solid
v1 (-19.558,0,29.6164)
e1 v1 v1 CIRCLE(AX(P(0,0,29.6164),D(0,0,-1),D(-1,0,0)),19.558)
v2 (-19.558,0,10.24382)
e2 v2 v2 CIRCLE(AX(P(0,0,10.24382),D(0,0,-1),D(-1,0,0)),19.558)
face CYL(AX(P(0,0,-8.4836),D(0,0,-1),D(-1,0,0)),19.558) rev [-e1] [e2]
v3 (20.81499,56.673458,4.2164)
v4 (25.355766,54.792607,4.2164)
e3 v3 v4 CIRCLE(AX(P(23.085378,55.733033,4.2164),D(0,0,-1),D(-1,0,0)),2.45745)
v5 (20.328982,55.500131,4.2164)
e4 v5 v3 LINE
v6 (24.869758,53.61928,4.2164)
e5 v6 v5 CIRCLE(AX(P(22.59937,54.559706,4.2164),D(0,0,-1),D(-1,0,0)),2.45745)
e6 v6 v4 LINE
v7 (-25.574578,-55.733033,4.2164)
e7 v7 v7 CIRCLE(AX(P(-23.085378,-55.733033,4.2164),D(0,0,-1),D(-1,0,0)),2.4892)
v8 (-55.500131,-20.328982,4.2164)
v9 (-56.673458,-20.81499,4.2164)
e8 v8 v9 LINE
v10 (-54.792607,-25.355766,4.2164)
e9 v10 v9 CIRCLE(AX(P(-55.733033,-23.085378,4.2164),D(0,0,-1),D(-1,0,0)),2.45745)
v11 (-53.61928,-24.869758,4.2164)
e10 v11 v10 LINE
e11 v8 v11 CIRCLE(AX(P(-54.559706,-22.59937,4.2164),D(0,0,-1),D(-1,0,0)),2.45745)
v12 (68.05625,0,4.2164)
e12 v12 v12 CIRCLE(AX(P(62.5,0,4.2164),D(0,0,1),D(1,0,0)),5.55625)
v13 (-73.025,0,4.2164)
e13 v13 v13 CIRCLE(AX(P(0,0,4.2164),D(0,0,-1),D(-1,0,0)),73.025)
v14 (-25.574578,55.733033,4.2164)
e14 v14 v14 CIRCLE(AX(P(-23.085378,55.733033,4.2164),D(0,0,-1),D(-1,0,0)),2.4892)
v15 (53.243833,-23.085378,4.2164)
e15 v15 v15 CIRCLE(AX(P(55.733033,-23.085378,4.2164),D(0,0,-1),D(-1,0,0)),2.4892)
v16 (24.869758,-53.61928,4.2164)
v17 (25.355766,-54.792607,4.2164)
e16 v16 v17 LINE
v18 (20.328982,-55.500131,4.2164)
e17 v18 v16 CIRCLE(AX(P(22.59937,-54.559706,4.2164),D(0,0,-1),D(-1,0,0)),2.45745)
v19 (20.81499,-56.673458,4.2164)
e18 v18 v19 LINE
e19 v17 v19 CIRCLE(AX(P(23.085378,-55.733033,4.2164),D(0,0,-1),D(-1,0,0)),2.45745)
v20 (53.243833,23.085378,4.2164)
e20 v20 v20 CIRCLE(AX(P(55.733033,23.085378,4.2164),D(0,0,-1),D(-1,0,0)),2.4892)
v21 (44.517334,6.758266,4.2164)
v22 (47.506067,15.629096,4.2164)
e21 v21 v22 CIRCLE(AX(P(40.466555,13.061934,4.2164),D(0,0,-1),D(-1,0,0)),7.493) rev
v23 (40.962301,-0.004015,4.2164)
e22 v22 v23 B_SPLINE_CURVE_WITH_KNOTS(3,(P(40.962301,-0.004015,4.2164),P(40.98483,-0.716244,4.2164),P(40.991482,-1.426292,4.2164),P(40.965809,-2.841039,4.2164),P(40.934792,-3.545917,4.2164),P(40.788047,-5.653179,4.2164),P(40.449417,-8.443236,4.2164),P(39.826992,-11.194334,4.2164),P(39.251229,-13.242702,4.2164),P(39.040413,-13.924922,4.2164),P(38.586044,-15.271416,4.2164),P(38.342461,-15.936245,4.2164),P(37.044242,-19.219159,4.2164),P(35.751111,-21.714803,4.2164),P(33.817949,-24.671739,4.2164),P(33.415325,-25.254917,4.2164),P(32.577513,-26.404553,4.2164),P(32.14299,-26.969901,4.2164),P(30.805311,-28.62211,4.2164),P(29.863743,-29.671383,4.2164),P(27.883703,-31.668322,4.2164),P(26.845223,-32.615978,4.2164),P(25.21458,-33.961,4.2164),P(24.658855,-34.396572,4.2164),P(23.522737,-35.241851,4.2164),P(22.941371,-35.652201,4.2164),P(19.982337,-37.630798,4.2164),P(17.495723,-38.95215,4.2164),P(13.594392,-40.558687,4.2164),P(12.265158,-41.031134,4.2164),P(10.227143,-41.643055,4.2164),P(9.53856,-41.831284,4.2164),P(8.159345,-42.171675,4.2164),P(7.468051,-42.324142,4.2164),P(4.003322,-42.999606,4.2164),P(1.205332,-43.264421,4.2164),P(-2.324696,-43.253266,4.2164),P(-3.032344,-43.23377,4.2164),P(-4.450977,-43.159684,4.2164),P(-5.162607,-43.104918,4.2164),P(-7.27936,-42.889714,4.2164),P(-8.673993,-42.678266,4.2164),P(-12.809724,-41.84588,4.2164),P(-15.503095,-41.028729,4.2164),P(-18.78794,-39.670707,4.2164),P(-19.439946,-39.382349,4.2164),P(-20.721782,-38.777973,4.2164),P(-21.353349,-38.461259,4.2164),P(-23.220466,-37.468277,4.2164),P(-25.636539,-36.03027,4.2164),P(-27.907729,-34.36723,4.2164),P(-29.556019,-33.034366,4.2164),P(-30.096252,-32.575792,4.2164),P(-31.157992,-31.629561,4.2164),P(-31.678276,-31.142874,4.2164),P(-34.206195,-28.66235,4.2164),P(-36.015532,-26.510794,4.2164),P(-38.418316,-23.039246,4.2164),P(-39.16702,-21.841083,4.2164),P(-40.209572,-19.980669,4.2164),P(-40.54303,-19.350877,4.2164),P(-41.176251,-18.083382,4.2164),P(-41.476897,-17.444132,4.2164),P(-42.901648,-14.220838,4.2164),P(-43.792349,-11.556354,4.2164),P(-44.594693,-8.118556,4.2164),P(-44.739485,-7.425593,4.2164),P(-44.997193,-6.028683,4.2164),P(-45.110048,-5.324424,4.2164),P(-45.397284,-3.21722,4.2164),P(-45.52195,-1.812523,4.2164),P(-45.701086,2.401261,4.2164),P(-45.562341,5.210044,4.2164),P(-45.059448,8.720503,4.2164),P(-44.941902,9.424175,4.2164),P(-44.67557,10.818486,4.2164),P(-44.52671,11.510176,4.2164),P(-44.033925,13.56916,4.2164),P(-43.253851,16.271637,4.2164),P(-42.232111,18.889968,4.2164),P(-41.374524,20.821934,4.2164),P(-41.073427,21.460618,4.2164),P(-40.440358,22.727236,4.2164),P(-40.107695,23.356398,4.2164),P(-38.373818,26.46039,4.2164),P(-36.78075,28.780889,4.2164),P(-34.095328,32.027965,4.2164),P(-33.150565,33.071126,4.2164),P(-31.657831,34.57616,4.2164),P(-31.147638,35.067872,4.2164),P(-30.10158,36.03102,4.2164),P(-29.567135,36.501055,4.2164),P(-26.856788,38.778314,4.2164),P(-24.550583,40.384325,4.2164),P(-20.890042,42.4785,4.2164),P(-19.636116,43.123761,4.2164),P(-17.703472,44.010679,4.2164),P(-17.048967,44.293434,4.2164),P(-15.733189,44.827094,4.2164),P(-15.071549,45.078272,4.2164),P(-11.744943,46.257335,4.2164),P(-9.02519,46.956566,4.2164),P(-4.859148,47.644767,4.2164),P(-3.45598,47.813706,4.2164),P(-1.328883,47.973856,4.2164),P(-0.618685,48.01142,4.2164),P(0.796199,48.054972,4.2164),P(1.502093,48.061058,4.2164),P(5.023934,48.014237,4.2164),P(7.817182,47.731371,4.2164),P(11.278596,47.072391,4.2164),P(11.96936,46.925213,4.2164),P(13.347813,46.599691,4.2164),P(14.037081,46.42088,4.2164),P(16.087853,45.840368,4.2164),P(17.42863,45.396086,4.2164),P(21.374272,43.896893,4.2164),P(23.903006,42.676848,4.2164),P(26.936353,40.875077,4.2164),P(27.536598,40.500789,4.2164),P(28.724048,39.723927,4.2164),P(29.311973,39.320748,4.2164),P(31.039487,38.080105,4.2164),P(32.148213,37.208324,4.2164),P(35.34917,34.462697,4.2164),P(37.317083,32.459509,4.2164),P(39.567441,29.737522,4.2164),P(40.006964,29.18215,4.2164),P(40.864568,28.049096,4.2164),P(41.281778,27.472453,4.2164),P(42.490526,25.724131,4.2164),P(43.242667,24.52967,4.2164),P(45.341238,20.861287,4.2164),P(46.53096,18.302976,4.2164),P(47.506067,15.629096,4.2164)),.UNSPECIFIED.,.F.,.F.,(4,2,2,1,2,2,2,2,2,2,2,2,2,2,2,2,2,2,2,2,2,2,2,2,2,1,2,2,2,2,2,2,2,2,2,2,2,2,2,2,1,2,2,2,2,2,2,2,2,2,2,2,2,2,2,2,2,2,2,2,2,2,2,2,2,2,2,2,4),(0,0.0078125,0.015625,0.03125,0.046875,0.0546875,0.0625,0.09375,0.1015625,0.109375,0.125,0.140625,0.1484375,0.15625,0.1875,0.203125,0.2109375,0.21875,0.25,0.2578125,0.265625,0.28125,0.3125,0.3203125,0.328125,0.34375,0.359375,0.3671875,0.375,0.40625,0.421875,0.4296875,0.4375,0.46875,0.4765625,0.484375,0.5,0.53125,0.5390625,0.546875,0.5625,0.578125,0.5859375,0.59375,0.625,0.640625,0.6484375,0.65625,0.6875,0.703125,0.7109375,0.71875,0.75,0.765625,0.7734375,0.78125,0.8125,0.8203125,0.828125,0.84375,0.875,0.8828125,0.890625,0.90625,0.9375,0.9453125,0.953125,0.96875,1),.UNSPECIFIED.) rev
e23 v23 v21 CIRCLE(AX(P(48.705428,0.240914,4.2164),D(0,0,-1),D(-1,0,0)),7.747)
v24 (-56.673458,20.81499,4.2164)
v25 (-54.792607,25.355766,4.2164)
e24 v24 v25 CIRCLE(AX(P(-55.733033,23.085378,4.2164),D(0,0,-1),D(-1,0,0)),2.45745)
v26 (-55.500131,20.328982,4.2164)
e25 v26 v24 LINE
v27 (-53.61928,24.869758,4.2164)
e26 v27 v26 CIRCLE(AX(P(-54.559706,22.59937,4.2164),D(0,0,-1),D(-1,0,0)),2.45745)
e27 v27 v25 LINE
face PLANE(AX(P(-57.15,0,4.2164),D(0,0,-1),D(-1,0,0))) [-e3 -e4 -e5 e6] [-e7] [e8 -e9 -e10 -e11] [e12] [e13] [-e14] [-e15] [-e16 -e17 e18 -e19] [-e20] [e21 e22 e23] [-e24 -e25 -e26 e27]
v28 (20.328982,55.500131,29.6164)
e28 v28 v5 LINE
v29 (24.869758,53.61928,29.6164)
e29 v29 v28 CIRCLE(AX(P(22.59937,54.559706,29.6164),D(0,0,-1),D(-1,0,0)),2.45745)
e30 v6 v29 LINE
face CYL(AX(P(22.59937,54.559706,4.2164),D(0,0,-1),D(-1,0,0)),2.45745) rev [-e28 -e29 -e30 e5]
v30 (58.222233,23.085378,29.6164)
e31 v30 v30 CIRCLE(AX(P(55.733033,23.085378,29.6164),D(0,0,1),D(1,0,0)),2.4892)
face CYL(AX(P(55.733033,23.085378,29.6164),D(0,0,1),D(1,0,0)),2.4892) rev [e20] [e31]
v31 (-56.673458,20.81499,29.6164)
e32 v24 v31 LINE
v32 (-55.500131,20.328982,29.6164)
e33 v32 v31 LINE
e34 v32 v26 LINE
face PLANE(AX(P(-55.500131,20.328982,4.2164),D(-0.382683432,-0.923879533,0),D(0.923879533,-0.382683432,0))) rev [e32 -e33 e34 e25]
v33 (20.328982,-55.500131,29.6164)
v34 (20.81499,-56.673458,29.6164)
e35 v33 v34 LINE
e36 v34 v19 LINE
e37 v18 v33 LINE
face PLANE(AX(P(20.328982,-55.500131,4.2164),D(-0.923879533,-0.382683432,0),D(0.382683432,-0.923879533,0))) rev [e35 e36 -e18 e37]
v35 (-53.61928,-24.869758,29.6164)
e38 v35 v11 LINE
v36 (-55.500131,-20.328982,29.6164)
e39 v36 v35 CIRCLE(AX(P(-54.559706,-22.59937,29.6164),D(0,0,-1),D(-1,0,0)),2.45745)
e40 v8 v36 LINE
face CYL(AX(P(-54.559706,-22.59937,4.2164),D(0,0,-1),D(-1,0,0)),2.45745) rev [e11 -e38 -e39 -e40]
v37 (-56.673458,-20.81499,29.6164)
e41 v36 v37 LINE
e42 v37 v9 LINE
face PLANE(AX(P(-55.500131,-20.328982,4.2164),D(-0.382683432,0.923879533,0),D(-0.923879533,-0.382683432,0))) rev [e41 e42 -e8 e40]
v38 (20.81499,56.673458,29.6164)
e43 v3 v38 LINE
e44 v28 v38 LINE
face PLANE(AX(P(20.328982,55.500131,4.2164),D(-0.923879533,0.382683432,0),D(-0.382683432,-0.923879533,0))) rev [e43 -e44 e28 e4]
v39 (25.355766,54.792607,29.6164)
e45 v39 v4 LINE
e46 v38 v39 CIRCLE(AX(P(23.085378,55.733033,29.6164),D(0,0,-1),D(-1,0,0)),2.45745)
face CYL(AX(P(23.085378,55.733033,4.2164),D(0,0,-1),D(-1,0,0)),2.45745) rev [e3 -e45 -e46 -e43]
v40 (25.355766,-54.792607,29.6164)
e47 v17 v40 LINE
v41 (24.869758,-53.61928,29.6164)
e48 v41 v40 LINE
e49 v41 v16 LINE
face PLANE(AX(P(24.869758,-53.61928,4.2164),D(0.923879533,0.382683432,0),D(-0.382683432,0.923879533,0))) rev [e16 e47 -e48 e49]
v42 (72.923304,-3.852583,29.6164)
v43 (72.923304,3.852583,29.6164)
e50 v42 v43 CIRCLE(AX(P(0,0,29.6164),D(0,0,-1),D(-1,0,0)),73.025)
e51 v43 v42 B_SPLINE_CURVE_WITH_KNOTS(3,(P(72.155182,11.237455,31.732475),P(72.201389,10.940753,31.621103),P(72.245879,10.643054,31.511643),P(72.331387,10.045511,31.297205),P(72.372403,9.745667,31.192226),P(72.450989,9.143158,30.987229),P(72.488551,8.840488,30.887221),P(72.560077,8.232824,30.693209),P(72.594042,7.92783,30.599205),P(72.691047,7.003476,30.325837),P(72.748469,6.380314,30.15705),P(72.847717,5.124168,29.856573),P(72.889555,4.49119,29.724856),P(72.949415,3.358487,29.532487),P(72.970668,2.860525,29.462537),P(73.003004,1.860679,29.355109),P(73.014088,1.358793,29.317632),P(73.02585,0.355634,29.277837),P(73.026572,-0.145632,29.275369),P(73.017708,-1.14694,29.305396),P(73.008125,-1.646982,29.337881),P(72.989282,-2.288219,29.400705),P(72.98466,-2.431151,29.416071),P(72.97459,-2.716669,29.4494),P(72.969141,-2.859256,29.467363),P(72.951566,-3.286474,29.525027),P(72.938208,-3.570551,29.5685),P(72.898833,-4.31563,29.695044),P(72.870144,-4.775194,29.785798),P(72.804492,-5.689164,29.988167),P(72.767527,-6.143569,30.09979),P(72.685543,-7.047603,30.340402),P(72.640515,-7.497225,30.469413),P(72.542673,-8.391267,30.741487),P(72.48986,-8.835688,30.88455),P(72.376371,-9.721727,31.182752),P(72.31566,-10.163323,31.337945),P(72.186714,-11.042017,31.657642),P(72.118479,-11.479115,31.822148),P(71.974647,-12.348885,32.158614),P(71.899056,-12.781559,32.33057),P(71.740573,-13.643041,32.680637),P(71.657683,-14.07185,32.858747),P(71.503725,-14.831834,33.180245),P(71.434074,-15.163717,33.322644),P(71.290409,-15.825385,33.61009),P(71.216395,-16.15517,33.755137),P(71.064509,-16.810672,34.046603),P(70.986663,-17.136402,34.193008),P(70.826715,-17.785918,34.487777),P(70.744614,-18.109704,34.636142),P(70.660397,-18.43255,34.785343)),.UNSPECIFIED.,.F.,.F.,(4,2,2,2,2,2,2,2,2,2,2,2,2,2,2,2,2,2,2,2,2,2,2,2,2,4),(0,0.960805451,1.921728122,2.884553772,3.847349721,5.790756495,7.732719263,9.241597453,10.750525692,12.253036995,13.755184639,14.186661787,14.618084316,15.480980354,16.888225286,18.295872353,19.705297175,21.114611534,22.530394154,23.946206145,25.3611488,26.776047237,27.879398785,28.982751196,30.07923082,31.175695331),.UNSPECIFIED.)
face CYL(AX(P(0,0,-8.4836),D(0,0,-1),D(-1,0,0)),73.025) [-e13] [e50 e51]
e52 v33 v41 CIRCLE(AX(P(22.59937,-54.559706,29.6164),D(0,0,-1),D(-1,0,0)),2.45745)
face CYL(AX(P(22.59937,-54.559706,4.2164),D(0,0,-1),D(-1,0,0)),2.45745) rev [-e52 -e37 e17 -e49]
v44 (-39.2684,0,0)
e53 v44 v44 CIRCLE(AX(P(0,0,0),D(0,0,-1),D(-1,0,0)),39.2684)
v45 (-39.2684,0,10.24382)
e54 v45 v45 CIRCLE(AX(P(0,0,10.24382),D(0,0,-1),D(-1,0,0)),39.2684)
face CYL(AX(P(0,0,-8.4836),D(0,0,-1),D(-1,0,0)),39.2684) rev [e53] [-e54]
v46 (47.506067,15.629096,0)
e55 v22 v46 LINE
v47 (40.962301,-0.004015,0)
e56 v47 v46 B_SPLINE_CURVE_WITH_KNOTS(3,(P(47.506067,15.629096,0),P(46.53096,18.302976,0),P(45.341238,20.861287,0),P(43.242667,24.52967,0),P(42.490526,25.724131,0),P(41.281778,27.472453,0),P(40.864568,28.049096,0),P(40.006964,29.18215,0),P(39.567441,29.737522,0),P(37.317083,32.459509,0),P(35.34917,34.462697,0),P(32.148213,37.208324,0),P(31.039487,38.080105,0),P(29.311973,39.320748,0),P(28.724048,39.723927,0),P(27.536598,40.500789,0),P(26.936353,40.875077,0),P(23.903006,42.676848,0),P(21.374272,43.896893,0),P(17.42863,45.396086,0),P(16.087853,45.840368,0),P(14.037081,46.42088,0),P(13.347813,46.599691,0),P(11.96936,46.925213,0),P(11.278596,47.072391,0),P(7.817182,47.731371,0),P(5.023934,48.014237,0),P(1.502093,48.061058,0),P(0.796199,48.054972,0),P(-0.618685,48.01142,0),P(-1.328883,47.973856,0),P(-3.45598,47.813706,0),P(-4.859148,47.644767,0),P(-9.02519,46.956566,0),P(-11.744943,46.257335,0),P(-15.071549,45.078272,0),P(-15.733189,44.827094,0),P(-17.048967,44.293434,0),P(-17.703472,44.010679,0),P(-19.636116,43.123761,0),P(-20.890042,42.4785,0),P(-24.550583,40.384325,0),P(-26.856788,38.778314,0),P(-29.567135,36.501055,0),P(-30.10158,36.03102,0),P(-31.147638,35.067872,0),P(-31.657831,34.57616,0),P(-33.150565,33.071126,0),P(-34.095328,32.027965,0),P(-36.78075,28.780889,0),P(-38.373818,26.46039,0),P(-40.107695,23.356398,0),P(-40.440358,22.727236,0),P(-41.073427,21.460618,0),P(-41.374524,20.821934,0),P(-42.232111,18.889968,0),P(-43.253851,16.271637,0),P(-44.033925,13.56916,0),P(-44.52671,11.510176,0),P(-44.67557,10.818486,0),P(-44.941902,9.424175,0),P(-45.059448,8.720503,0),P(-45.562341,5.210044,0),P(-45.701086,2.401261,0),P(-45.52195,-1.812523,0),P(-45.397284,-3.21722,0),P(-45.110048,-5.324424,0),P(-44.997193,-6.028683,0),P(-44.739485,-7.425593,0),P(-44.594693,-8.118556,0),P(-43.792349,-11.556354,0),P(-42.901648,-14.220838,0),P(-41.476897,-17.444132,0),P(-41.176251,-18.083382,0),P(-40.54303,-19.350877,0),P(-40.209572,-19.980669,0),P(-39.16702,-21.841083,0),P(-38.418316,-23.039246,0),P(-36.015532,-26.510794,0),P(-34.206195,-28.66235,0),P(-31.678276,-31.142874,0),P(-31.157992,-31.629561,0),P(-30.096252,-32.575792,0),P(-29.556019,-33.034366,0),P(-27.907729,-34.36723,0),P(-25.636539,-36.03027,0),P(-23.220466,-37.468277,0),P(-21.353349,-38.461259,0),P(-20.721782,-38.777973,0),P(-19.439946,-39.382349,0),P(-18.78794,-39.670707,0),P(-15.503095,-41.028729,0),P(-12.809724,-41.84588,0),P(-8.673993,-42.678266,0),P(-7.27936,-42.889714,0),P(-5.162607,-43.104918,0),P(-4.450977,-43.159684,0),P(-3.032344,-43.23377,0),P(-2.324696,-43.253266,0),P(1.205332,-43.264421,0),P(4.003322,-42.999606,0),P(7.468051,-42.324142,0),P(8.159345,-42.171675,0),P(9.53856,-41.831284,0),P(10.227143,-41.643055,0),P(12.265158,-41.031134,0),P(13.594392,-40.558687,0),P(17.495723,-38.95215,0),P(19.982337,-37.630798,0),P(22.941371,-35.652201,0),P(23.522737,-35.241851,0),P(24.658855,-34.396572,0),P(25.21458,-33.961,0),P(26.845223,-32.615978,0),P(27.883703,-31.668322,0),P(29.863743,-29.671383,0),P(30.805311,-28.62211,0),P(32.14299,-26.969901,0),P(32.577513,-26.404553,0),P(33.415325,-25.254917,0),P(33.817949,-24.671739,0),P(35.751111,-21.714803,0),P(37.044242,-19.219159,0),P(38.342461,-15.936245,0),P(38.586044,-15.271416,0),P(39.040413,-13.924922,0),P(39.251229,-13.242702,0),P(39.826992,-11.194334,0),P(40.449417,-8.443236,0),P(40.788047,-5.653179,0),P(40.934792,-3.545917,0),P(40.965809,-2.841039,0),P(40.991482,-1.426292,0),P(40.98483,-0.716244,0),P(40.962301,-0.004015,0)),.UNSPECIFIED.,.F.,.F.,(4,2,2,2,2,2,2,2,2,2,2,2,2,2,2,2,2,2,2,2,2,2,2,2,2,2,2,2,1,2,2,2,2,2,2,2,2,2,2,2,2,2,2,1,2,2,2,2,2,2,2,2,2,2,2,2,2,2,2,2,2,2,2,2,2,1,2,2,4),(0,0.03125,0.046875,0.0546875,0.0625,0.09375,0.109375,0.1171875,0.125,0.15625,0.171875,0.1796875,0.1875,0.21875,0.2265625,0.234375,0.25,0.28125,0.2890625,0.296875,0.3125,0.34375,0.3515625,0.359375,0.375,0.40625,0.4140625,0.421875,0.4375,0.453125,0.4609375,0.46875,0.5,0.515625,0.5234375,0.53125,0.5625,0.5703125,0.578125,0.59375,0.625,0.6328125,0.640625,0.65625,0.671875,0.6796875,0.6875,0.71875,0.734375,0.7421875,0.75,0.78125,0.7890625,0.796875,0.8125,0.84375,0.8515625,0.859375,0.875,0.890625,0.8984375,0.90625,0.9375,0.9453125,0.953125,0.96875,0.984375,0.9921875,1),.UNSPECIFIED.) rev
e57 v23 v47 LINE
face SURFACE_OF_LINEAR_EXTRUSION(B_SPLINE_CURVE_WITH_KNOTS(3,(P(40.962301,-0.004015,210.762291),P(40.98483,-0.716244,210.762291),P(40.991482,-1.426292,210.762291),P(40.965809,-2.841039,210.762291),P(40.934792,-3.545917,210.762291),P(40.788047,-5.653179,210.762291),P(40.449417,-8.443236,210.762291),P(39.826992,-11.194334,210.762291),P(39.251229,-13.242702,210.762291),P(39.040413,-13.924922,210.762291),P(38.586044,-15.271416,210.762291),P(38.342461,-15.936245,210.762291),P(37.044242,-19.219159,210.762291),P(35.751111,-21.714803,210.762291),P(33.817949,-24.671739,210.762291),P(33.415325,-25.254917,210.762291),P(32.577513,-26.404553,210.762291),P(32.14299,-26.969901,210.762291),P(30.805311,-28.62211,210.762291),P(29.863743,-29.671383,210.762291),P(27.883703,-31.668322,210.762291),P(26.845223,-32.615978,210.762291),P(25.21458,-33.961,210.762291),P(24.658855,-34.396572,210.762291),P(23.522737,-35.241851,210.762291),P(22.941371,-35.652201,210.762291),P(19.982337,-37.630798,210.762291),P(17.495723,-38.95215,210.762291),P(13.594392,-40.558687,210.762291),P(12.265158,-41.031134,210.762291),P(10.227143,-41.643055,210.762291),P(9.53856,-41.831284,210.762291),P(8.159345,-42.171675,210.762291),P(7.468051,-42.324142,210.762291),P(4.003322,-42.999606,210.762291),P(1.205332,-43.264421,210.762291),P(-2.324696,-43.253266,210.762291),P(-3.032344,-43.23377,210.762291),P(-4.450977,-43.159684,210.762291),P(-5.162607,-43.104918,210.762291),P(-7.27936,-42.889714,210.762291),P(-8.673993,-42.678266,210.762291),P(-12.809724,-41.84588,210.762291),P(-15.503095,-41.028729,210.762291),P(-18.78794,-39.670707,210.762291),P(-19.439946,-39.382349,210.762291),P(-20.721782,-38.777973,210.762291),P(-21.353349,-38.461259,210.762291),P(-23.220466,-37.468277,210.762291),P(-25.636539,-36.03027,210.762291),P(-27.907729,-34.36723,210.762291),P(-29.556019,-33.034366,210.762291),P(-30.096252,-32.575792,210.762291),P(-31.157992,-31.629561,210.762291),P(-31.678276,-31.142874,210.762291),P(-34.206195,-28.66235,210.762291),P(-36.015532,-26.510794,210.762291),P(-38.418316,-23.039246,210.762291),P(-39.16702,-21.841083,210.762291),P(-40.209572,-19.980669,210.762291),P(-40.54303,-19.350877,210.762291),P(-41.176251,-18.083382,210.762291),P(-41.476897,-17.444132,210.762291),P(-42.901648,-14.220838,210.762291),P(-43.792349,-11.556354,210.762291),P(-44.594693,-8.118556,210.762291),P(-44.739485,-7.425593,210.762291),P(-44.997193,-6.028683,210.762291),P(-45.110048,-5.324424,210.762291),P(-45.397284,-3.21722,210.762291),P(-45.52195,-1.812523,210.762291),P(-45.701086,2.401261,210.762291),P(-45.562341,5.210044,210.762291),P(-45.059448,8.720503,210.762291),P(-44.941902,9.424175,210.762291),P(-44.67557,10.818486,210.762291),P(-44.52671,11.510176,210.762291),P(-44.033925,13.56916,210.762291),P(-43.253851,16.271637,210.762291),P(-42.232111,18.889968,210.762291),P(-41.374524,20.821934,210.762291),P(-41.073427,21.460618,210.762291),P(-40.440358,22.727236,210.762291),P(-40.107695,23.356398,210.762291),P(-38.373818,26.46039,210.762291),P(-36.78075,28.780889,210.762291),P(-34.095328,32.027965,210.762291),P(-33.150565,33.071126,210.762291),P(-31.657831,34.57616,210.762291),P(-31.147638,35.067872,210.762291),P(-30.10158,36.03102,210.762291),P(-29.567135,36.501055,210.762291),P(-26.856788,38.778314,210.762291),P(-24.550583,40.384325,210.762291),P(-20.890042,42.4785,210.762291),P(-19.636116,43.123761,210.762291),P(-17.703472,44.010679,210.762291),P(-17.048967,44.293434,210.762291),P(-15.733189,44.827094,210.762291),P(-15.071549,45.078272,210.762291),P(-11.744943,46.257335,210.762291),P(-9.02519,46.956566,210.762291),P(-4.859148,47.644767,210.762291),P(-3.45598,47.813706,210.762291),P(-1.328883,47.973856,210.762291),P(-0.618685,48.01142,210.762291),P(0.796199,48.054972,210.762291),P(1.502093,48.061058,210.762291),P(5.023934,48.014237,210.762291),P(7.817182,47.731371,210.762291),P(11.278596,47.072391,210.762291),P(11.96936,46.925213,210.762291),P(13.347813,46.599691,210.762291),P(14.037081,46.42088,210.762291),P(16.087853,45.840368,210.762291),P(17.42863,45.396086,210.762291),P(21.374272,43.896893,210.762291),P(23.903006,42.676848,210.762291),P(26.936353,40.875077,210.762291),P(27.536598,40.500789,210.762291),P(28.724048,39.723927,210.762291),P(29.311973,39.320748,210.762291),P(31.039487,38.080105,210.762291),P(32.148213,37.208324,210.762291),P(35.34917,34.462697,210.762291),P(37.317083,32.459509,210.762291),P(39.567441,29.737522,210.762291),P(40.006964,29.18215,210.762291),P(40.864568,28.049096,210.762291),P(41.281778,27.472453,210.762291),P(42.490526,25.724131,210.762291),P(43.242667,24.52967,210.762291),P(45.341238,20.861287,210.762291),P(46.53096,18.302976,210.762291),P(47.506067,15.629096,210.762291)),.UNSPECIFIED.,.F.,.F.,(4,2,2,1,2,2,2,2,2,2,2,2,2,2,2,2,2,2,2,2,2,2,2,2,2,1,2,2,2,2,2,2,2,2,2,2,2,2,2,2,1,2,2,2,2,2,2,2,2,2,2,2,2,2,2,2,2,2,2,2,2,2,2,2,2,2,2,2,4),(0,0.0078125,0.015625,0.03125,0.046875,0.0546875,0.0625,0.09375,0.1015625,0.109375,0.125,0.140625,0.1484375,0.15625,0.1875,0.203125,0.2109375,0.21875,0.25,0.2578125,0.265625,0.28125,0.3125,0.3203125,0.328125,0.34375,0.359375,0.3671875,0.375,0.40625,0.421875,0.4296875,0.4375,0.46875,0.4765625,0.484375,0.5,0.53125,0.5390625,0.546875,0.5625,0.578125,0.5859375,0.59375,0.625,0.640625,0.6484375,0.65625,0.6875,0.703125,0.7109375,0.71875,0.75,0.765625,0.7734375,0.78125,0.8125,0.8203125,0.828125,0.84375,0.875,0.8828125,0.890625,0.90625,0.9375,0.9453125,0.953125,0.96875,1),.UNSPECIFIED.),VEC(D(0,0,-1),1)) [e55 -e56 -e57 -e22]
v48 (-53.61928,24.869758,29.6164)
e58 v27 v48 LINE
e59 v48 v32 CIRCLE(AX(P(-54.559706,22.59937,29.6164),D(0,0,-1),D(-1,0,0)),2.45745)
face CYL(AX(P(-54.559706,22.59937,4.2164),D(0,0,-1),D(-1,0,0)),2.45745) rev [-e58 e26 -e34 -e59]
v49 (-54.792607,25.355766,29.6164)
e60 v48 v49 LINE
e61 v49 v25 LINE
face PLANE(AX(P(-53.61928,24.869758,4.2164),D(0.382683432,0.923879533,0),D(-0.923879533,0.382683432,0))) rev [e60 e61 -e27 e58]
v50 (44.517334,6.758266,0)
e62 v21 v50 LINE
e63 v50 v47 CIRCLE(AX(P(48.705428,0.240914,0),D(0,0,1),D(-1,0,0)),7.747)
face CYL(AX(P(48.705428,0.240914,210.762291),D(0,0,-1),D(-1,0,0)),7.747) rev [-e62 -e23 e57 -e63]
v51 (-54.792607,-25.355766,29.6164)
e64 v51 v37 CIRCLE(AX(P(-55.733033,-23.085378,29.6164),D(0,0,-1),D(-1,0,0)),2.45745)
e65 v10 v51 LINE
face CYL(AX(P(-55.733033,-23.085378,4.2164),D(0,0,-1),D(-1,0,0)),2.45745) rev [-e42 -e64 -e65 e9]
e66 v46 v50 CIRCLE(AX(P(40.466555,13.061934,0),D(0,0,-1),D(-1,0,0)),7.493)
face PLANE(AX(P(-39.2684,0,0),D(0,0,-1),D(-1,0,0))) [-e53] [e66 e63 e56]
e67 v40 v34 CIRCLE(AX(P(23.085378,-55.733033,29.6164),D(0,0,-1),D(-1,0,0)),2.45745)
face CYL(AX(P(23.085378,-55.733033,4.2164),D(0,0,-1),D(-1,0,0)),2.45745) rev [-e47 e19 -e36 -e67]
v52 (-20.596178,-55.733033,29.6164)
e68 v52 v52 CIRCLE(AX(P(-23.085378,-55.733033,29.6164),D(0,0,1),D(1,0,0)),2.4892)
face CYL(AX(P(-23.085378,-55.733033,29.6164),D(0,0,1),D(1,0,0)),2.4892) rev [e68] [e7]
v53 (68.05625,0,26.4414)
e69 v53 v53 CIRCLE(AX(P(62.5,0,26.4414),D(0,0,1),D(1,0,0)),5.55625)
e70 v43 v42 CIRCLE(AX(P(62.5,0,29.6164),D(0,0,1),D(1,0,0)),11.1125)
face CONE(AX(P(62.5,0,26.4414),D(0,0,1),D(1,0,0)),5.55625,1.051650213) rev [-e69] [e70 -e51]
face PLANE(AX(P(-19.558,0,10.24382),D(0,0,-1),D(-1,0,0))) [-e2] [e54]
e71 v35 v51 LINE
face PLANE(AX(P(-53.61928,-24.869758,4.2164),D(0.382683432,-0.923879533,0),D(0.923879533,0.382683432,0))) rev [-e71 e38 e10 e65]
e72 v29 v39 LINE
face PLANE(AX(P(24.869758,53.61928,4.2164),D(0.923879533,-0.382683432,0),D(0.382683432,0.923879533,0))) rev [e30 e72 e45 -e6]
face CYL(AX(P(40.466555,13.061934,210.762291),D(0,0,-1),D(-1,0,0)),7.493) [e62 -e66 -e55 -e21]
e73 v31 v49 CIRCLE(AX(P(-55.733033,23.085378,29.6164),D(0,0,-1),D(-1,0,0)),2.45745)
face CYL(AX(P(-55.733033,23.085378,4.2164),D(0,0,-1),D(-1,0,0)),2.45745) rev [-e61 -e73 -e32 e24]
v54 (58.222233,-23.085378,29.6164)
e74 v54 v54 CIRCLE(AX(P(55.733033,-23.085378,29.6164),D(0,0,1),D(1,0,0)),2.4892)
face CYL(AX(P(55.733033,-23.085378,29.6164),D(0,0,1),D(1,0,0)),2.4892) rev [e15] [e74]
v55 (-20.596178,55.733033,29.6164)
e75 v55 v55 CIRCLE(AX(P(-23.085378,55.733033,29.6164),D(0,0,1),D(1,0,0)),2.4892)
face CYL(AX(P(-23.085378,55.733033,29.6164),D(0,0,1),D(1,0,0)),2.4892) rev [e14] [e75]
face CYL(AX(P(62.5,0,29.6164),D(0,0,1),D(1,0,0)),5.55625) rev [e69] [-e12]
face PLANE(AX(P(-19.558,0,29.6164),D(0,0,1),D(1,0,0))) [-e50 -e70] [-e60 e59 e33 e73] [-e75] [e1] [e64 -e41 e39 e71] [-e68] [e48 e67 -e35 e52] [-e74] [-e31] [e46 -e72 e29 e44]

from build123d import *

# Parameters (mm, degrees)
CUT_EXTRUDE1_START               = 4.2164
SKETCH18_R                       = 57.15
CUT_EXTRUDE1_DEPTH               = 4.2164
F_10_CLEARANCE_HOLE1_D           = 4.9784
CIRPATTERN1_COUNT                = 8
CLEARANCING_START                = -4.2164
SKETCH32_R                       = 73.025
CLEARANCING_DEPTH                = 4.2164
F_10_START                       = 4.2164
F_10_0_1935_DIAMETER_SLOT1_DEPTH = 25.4
CIRPATTERN2_COUNT                = 8


# Read off the part's stored shape, not the designer's step: #10 (0.1935) Diameter Slot1
with BuildPart() as part:
    # Sketch25 → Revolve1 (revolve)
    with BuildSketch(Plane(origin=(0, 0, 0), x_dir=(1, 0, 0), z_dir=(0, 1, 0))):
        Polygon((-19.558, -29.6164), (-19.558, -10.24382), (-39.2684, -10.24382), (-39.2684, 0), (-57.15, 0), (-57.15, -4.2164), (-73.025, -4.2164), (-73.025, -29.6164), align=None)
    revolve(axis=Axis((0, 0, -8.4836), (0, 0, 1)))

    # Sketch18 → Cut-Extrude1 (cut)
    with BuildSketch(Plane.XY.offset(CUT_EXTRUDE1_START)):
        Circle(SKETCH18_R)
        with BuildLine():
            add(Edge.make_bspline(
                [(41.089237213, 0), (41.091962531, -0.086157587), (41.097413749, -0.258491166), (41.10355964, -0.517077072), (41.10820678, -0.775748178), (41.11421023, -1.293415642), (41.109015311, -2.589274196), (41.017814103, -4.490313926), (40.7831208, -6.729807087), (40.462314107, -8.787506492), (40.037808727, -10.829994254), (39.510298345, -12.852043551), (38.880746853, -14.848458078), (38.15038378, -16.814086746), (37.320701547, -18.743836999), (36.393451781, -20.63268838), (35.370641466, -22.475705706), (34.254528452, -24.268052099), (33.047616433, -26.005001751), (31.752649319, -27.681952446), (30.372605018, -29.294437787), (28.910688618, -30.83813911), (27.370324987, -32.308897058), (25.755150794, -33.702722776), (24.069005972, -35.015808715), (22.315924639, -36.244539), (20.500125495, -37.385499343), (18.62600172, -38.435486481), (16.698110388, -39.3915171), (14.721161433, -40.250836227), (12.700006186, -41.010925075), (10.639625512, -41.669508306), (8.545117571, -42.224560694), (6.421685244, -42.674313186), (4.274623243, -43.017258312), (2.109304944, -43.252154961), (-0.068831028, -43.378032487), (-2.254294428, -43.394194133), (-4.441557201, -43.300219785), (-6.625067428, -43.095968006), (-8.799263397, -42.781577389), (-10.958587737, -42.35746718), (-13.097501591, -41.8243372), (-15.210498799, -41.183167044), (-17.292120038, -40.435214565), (-19.336966901, -39.582013644), (-21.339715858, -38.62537124), (-23.295132091, -37.567363743), (-25.198083132, -36.410332623), (-27.043552306, -35.156879378), (-28.826651909, -33.809859817), (-30.542636113, -32.372377659), (-32.186913551, -30.847777489), (-33.75505955, -29.239637062), (-35.242827981, -27.551758997), (-36.6461627, -25.788161864), (-37.961208531, -23.953070684), (-39.184321792, -22.050906876), (-40.312080298, -20.086277666), (-41.34129285, -18.063964982), (-42.269008156, -15.988913871), (-43.092523175, -13.866220454), (-43.809390856, -11.701119456), (-44.417427247, -9.498971339), (-44.914717965, -7.265249075), (-45.299623986, -5.005524575), (-45.570786769, -2.725454833), (-45.727132667, -0.430767795), (-45.767876634, 1.872751999), (-45.692525205, 4.179277959), (-45.500878745, 6.482956161), (-45.193032951, 8.777920163), (-44.76937961, 11.058305925), (-44.2306066, 13.318266753), (-43.577697135, 15.551988265), (-42.811928261, 17.753703317), (-41.934868588, 19.917706858), (-40.948375273, 22.038370685), (-39.854590259, 24.110158043), (-38.655935769, 26.127638043), (-37.35510908, 28.085499861), (-35.95507656, 29.978566677), (-34.45906702, 31.801809315), (-32.870564351, 33.550359561), (-31.193299507, 35.2195231), (-29.431241811, 36.804792072), (-27.58858964, 38.301857174), (-25.669760482, 39.706619311), (-23.67938041, 41.015200739), (-21.62227298, 42.22395569), (-19.503447594, 43.329480427), (-17.328087349, 44.32862273), (-15.101536401, 45.218490759), (-12.829286876, 45.996461288), (-10.51696536, 46.660187279), (-8.170319005, 47.207604779), (-5.795201275, 47.63693911), (-3.397557376, 47.946710349), (-0.983409407, 48.13573807), (1.441158736, 48.203145338), (3.870016668, 48.148361942), (6.297002983, 47.971126851), (8.715940862, 47.671489899), (11.120653763, 47.249812672), (13.504981164, 46.706768607), (15.862794321, 46.043342297), (18.188011992, 45.260827993), (20.47461609, 44.360827321), (22.71666723, 43.345246195), (24.908320125, 42.216290953), (27.043838787, 40.976463712), (29.117611505, 39.628556947), (31.12416555, 38.175647316), (33.058181574, 36.621088743), (34.914507669, 34.968504765), (36.688173034, 33.221780166), (38.374401232, 31.385051924), (39.968622994, 29.462699478), (41.466488529, 27.459334348), (42.863879321, 25.37978913), (44.156919368, 23.229105887), (45.341985843, 21.012523976), (46.415719137, 18.735467323), (47.152873419, 16.943563677), (47.537044371, 15.914838228), (47.625380995, 15.672606956)],
                knots=[0, 0, 0, 0, 0.000898736, 0.001797664, 0.002696784, 0.003596095, 0.007195255, 0.016206602, 0.023429565, 0.030664921, 0.03791271, 0.04517297, 0.052445735, 0.059731037, 0.067028905, 0.074339368, 0.081662453, 0.088998186, 0.096346593, 0.103707696, 0.111081519, 0.118468084, 0.125867414, 0.13327953, 0.140704451, 0.148142199, 0.155592793, 0.163056252, 0.170532595, 0.178021841, 0.185524007, 0.193039111, 0.200567171, 0.208108204, 0.215662226, 0.223229255, 0.230809306, 0.238402396, 0.24600854, 0.253627754, 0.261260054, 0.268905454, 0.27656397, 0.284235617, 0.291920409, 0.29961836, 0.307329485, 0.315053798, 0.322791313, 0.330542044, 0.338306004, 0.346083208, 0.353873668, 0.361677398, 0.369494411, 0.37732472, 0.385168337, 0.393025277, 0.400895551, 0.408779172, 0.416676152, 0.424586504, 0.432510241, 0.440447374, 0.448397915, 0.456361877, 0.464339271, 0.472330109, 0.480334403, 0.488352164, 0.496383405, 0.504428136, 0.512486369, 0.520558115, 0.528643386, 0.536742193, 0.544854546, 0.552980457, 0.561119937, 0.569272997, 0.577439648, 0.585619899, 0.593813763, 0.60202125, 0.61024237, 0.618477134, 0.626725552, 0.634987634, 0.643263392, 0.651552835, 0.659855974, 0.668172818, 0.676503379, 0.684847665, 0.693205688, 0.701577457, 0.709962981, 0.718362272, 0.726775338, 0.73520219, 0.743642837, 0.752097289, 0.760565555, 0.769047646, 0.777543571, 0.786053339, 0.79457696, 0.803114443, 0.811665798, 0.820231034, 0.828810161, 0.837403187, 0.846010122, 0.854630975, 0.863265756, 0.871914473, 0.880577136, 0.889253753, 0.897944334, 0.906648887, 0.915367423, 0.924099948, 0.932846474, 0.941607007, 0.944295232, 0.944295232, 0.944295232, 0.944295232], degree=3))
            ThreePointArc((47.625380995, 15.672606956), (47.687720846, 10.629001226), (44.585991464, 6.651424093))
            ThreePointArc((44.585991464, 6.651424093), (41.960682048, 3.786728615), (41.089237213, 0))
        make_face(mode=Mode.SUBTRACT)
    extrude(amount=-CUT_EXTRUDE1_DEPTH, mode=Mode.SUBTRACT)

    # Sketch20 one side → Turbine Shaft Hole (revolve, cut)
    with BuildSketch(Plane(origin=(0, 0, 0), x_dir=(1, 0, 0), z_dir=(0, 1, 0)), mode=Mode.PRIVATE) as turbine_shaft_hole_sk:
        Polygon((56.94375, -26.4414), (51.3875, -29.6164), (62.5, -29.6164), (62.5, -4.2164), (56.94375, -4.2164), align=None)
    revolve(turbine_shaft_hole_sk.sketch.rotate(Axis((62.5, 0, 29.6164), (0, 0, -1)), 180), axis=Axis((62.5, 0, 29.6164), (0, 0, -1)), mode=Mode.SUBTRACT)

    # #10 Clearance Hole1 (through all)
    with Locations(Plane(origin=(55.733032799, -23.085378057, 29.6164), x_dir=(1, 0, 0), z_dir=(0, 0, 1))):
        with Locations((0, 0)):
            f_10_clearance_hole1 = Hole(F_10_CLEARANCE_HOLE1_D / 2)

    # CirPattern1: #10 Clearance Hole1 ×8 about axis, 4 skipped
    cirpattern1_axis = Axis((0, 0, 0), (0, 0, 1))
    add([f_10_clearance_hole1.rotate(cirpattern1_axis, i * 360 / CIRPATTERN1_COUNT) for i in range(1, CIRPATTERN1_COUNT) if i not in (2, 4, 5, 7)], mode=Mode.SUBTRACT)

    # Sketch32 → Clearancing (cut)
    with BuildSketch(Plane(origin=(0, 0, 0), x_dir=(-1, 0, 0), z_dir=(0, 0, -1)).offset(CLEARANCING_START)):
        Circle(SKETCH32_R)
        with BuildLine():
            ThreePointArc((-47.506067229, 15.629095748), (-47.567368082, 10.669550114), (-44.51733419, 6.758265932))
            ThreePointArc((-44.51733419, 6.758265932), (-41.848269617, 3.845825531), (-40.962300701, -0.004015228))
            add(Edge.make_bspline(
                [(-40.962300701, -0.004015228), (-40.984829754, -0.716243545), (-40.991482345, -1.426292399), (-40.965808515, -2.841039211), (-40.934791994, -3.545916987), (-40.788046598, -5.65317915), (-40.449416827, -8.44323574), (-39.826992242, -11.194334019), (-39.251228801, -13.242702158), (-39.04041264, -13.924921757), (-38.586043887, -15.271416492), (-38.342460818, -15.936244836), (-37.044241995, -19.219159068), (-35.751111298, -21.714802599), (-33.817948717, -24.671739224), (-33.415325439, -25.254916955), (-32.577512865, -26.404553153), (-32.142989691, -26.969901223), (-30.805310798, -28.622109954), (-29.863742521, -29.67138319), (-27.88370287, -31.668321975), (-26.84522274, -32.615978344), (-25.214580249, -33.961000268), (-24.658855428, -34.396572383), (-23.52273746, -35.241850655), (-22.941371199, -35.652200602), (-19.982337143, -37.630798215), (-17.495723306, -38.952149767), (-13.594391809, -40.558687212), (-12.265158452, -41.031133778), (-10.227142901, -41.643055288), (-9.538560062, -41.831284287), (-8.159344959, -42.171675018), (-7.468051402, -42.324142065), (-4.003321953, -42.999606071), (-1.205332292, -43.264420661), (2.324696242, -43.253266134), (3.032343885, -43.233770306), (4.450976737, -43.159684207), (5.16260658, -43.104918353), (7.279359647, -42.889714494), (8.673993393, -42.678265993), (12.809724164, -41.845880015), (15.503095197, -41.028729387), (18.787939685, -39.670706521), (19.439945622, -39.382349429), (20.721782261, -38.777972555), (21.353348612, -38.461258619), (23.220466367, -37.468277477), (25.636538884, -36.03026989), (27.907728904, -34.367230475), (29.556019298, -33.034366172), (30.096251631, -32.575792031), (31.157992098, -31.629561277), (31.678275818, -31.142874487), (34.206194586, -28.662350465), (36.015531715, -26.510793678), (38.41831625, -23.039245987), (39.16701973, -21.841083162), (40.20957198, -19.98066895), (40.543029676, -19.350876534), (41.176251076, -18.083381709), (41.476896624, -17.444132119), (42.901648241, -14.220838418), (43.792349276, -11.556354365), (44.594692676, -8.118555948), (44.739484647, -7.425593495), (44.997193357, -6.028683216), (45.110048425, -5.324423569), (45.397284161, -3.217220036), (45.521950193, -1.812522973), (45.701086012, 2.401261181), (45.562340657, 5.210043831), (45.059447785, 8.720503026), (44.941902272, 9.424175437), (44.675570213, 10.818485677), (44.526710242, 11.510176401), (44.03392467, 13.569160455), (43.253850892, 16.271636591), (42.232110927, 18.889968175), (41.374523909, 20.821933821), (41.073427004, 21.460617921), (40.440358133, 22.727235888), (40.107694699, 23.35639756), (38.373818129, 26.460390162), (36.780750271, 28.78088885), (34.095328382, 32.027965174), (33.150564893, 33.07112628), (31.657831232, 34.576159768), (31.147637834, 35.06787246), (30.101580295, 36.031020228), (29.567134533, 36.501054535), (26.856787595, 38.778313639), (24.550582917, 40.384325472), (20.890041552, 42.47849974), (19.636115903, 43.123761403), (17.703471684, 44.01067886), (17.048967242, 44.293434078), (15.733188711, 44.827093949), (15.071549163, 45.078271992), (11.744943292, 46.257335392), (9.025190072, 46.956566279), (4.859147554, 47.644767103), (3.455979938, 47.813706456), (1.328883106, 47.973856364), (0.6186853, 48.011419961), (-0.796199225, 48.054972454), (-1.502092621, 48.06105803), (-5.023934167, 48.014237149), (-7.817182412, 47.731371248), (-11.278596108, 47.072391218), (-11.96936046, 46.925213328), (-13.347812594, 46.599690607), (-14.03708102, 46.420880282), (-16.087853103, 45.84036778), (-17.428630402, 45.396086399), (-21.374271765, 43.89689302), (-23.903005899, 42.67684778), (-26.936352555, 40.875077272), (-27.536597899, 40.500788916), (-28.724048455, 39.723926887), (-29.311972723, 39.320747942), (-31.039486686, 38.080104884), (-32.148213344, 37.208324215), (-35.349169758, 34.462697204), (-37.317082683, 32.459509238), (-39.567440801, 29.737522075), (-40.006964214, 29.18215008), (-40.86456786, 28.049096194), (-41.281778161, 27.472452922), (-42.490525828, 25.724130807), (-43.242666913, 24.529670436), (-45.341238448, 20.861286589), (-46.530959758, 18.302975659), (-47.506067229, 15.629095748)],
                knots=[0, 0, 0, 0, 0.0078125, 0.0078125, 0.015625, 0.015625, 0.03125, 0.046875, 0.046875, 0.0546875, 0.0546875, 0.0625, 0.0625, 0.09375, 0.09375, 0.1015625, 0.1015625, 0.109375, 0.109375, 0.125, 0.125, 0.140625, 0.140625, 0.1484375, 0.1484375, 0.15625, 0.15625, 0.1875, 0.1875, 0.203125, 0.203125, 0.2109375, 0.2109375, 0.21875, 0.21875, 0.25, 0.25, 0.2578125, 0.2578125, 0.265625, 0.265625, 0.28125, 0.28125, 0.3125, 0.3125, 0.3203125, 0.3203125, 0.328125, 0.328125, 0.34375, 0.359375, 0.359375, 0.3671875, 0.3671875, 0.375, 0.375, 0.40625, 0.40625, 0.421875, 0.421875, 0.4296875, 0.4296875, 0.4375, 0.4375, 0.46875, 0.46875, 0.4765625, 0.4765625, 0.484375, 0.484375, 0.5, 0.5, 0.53125, 0.53125, 0.5390625, 0.5390625, 0.546875, 0.546875, 0.5625, 0.578125, 0.578125, 0.5859375, 0.5859375, 0.59375, 0.59375, 0.625, 0.625, 0.640625, 0.640625, 0.6484375, 0.6484375, 0.65625, 0.65625, 0.6875, 0.6875, 0.703125, 0.703125, 0.7109375, 0.7109375, 0.71875, 0.71875, 0.75, 0.75, 0.765625, 0.765625, 0.7734375, 0.7734375, 0.78125, 0.78125, 0.8125, 0.8125, 0.8203125, 0.8203125, 0.828125, 0.828125, 0.84375, 0.84375, 0.875, 0.875, 0.8828125, 0.8828125, 0.890625, 0.890625, 0.90625, 0.90625, 0.9375, 0.9375, 0.9453125, 0.9453125, 0.953125, 0.953125, 0.96875, 0.96875, 1, 1, 1, 1], degree=3))
        make_face(mode=Mode.SUBTRACT)
    extrude(amount=CLEARANCING_DEPTH, mode=Mode.SUBTRACT)

    # #10 (0.1935) Diameter Slot1 outline → #10 (0.1935) Diameter Slot1 (cut)
    with BuildSketch(Plane.XY.offset(F_10_START)):
        with BuildLine():
            ThreePointArc((20.8149903, -56.6734582), (24.025803458, -58.003420556), (25.355765815, -54.792607398))
            Line((25.355765815, -54.792607398), (24.869757855, -53.619280392))
            ThreePointArc((24.869757855, -53.619280392), (21.658944697, -52.289318035), (20.328982341, -55.500131193))
            Line((20.328982341, -55.500131193), (20.8149903, -56.6734582))
        make_face()
    f_10_0_1935_diameter_slot1 = extrude(amount=F_10_0_1935_DIAMETER_SLOT1_DEPTH, mode=Mode.SUBTRACT)

    # CirPattern2: #10 (0.1935) Diameter Slot1 ×8 about axis, 4 skipped
    cirpattern2_axis = Axis((0, 0, -50.361336866), (0, 0, 1))
    add([f_10_0_1935_diameter_slot1.rotate(cirpattern2_axis, i * 360 / CIRPATTERN2_COUNT) for i in range(1, CIRPATTERN2_COUNT) if i not in (1, 2, 4, 7)], mode=Mode.SUBTRACT)


solid = part.part
